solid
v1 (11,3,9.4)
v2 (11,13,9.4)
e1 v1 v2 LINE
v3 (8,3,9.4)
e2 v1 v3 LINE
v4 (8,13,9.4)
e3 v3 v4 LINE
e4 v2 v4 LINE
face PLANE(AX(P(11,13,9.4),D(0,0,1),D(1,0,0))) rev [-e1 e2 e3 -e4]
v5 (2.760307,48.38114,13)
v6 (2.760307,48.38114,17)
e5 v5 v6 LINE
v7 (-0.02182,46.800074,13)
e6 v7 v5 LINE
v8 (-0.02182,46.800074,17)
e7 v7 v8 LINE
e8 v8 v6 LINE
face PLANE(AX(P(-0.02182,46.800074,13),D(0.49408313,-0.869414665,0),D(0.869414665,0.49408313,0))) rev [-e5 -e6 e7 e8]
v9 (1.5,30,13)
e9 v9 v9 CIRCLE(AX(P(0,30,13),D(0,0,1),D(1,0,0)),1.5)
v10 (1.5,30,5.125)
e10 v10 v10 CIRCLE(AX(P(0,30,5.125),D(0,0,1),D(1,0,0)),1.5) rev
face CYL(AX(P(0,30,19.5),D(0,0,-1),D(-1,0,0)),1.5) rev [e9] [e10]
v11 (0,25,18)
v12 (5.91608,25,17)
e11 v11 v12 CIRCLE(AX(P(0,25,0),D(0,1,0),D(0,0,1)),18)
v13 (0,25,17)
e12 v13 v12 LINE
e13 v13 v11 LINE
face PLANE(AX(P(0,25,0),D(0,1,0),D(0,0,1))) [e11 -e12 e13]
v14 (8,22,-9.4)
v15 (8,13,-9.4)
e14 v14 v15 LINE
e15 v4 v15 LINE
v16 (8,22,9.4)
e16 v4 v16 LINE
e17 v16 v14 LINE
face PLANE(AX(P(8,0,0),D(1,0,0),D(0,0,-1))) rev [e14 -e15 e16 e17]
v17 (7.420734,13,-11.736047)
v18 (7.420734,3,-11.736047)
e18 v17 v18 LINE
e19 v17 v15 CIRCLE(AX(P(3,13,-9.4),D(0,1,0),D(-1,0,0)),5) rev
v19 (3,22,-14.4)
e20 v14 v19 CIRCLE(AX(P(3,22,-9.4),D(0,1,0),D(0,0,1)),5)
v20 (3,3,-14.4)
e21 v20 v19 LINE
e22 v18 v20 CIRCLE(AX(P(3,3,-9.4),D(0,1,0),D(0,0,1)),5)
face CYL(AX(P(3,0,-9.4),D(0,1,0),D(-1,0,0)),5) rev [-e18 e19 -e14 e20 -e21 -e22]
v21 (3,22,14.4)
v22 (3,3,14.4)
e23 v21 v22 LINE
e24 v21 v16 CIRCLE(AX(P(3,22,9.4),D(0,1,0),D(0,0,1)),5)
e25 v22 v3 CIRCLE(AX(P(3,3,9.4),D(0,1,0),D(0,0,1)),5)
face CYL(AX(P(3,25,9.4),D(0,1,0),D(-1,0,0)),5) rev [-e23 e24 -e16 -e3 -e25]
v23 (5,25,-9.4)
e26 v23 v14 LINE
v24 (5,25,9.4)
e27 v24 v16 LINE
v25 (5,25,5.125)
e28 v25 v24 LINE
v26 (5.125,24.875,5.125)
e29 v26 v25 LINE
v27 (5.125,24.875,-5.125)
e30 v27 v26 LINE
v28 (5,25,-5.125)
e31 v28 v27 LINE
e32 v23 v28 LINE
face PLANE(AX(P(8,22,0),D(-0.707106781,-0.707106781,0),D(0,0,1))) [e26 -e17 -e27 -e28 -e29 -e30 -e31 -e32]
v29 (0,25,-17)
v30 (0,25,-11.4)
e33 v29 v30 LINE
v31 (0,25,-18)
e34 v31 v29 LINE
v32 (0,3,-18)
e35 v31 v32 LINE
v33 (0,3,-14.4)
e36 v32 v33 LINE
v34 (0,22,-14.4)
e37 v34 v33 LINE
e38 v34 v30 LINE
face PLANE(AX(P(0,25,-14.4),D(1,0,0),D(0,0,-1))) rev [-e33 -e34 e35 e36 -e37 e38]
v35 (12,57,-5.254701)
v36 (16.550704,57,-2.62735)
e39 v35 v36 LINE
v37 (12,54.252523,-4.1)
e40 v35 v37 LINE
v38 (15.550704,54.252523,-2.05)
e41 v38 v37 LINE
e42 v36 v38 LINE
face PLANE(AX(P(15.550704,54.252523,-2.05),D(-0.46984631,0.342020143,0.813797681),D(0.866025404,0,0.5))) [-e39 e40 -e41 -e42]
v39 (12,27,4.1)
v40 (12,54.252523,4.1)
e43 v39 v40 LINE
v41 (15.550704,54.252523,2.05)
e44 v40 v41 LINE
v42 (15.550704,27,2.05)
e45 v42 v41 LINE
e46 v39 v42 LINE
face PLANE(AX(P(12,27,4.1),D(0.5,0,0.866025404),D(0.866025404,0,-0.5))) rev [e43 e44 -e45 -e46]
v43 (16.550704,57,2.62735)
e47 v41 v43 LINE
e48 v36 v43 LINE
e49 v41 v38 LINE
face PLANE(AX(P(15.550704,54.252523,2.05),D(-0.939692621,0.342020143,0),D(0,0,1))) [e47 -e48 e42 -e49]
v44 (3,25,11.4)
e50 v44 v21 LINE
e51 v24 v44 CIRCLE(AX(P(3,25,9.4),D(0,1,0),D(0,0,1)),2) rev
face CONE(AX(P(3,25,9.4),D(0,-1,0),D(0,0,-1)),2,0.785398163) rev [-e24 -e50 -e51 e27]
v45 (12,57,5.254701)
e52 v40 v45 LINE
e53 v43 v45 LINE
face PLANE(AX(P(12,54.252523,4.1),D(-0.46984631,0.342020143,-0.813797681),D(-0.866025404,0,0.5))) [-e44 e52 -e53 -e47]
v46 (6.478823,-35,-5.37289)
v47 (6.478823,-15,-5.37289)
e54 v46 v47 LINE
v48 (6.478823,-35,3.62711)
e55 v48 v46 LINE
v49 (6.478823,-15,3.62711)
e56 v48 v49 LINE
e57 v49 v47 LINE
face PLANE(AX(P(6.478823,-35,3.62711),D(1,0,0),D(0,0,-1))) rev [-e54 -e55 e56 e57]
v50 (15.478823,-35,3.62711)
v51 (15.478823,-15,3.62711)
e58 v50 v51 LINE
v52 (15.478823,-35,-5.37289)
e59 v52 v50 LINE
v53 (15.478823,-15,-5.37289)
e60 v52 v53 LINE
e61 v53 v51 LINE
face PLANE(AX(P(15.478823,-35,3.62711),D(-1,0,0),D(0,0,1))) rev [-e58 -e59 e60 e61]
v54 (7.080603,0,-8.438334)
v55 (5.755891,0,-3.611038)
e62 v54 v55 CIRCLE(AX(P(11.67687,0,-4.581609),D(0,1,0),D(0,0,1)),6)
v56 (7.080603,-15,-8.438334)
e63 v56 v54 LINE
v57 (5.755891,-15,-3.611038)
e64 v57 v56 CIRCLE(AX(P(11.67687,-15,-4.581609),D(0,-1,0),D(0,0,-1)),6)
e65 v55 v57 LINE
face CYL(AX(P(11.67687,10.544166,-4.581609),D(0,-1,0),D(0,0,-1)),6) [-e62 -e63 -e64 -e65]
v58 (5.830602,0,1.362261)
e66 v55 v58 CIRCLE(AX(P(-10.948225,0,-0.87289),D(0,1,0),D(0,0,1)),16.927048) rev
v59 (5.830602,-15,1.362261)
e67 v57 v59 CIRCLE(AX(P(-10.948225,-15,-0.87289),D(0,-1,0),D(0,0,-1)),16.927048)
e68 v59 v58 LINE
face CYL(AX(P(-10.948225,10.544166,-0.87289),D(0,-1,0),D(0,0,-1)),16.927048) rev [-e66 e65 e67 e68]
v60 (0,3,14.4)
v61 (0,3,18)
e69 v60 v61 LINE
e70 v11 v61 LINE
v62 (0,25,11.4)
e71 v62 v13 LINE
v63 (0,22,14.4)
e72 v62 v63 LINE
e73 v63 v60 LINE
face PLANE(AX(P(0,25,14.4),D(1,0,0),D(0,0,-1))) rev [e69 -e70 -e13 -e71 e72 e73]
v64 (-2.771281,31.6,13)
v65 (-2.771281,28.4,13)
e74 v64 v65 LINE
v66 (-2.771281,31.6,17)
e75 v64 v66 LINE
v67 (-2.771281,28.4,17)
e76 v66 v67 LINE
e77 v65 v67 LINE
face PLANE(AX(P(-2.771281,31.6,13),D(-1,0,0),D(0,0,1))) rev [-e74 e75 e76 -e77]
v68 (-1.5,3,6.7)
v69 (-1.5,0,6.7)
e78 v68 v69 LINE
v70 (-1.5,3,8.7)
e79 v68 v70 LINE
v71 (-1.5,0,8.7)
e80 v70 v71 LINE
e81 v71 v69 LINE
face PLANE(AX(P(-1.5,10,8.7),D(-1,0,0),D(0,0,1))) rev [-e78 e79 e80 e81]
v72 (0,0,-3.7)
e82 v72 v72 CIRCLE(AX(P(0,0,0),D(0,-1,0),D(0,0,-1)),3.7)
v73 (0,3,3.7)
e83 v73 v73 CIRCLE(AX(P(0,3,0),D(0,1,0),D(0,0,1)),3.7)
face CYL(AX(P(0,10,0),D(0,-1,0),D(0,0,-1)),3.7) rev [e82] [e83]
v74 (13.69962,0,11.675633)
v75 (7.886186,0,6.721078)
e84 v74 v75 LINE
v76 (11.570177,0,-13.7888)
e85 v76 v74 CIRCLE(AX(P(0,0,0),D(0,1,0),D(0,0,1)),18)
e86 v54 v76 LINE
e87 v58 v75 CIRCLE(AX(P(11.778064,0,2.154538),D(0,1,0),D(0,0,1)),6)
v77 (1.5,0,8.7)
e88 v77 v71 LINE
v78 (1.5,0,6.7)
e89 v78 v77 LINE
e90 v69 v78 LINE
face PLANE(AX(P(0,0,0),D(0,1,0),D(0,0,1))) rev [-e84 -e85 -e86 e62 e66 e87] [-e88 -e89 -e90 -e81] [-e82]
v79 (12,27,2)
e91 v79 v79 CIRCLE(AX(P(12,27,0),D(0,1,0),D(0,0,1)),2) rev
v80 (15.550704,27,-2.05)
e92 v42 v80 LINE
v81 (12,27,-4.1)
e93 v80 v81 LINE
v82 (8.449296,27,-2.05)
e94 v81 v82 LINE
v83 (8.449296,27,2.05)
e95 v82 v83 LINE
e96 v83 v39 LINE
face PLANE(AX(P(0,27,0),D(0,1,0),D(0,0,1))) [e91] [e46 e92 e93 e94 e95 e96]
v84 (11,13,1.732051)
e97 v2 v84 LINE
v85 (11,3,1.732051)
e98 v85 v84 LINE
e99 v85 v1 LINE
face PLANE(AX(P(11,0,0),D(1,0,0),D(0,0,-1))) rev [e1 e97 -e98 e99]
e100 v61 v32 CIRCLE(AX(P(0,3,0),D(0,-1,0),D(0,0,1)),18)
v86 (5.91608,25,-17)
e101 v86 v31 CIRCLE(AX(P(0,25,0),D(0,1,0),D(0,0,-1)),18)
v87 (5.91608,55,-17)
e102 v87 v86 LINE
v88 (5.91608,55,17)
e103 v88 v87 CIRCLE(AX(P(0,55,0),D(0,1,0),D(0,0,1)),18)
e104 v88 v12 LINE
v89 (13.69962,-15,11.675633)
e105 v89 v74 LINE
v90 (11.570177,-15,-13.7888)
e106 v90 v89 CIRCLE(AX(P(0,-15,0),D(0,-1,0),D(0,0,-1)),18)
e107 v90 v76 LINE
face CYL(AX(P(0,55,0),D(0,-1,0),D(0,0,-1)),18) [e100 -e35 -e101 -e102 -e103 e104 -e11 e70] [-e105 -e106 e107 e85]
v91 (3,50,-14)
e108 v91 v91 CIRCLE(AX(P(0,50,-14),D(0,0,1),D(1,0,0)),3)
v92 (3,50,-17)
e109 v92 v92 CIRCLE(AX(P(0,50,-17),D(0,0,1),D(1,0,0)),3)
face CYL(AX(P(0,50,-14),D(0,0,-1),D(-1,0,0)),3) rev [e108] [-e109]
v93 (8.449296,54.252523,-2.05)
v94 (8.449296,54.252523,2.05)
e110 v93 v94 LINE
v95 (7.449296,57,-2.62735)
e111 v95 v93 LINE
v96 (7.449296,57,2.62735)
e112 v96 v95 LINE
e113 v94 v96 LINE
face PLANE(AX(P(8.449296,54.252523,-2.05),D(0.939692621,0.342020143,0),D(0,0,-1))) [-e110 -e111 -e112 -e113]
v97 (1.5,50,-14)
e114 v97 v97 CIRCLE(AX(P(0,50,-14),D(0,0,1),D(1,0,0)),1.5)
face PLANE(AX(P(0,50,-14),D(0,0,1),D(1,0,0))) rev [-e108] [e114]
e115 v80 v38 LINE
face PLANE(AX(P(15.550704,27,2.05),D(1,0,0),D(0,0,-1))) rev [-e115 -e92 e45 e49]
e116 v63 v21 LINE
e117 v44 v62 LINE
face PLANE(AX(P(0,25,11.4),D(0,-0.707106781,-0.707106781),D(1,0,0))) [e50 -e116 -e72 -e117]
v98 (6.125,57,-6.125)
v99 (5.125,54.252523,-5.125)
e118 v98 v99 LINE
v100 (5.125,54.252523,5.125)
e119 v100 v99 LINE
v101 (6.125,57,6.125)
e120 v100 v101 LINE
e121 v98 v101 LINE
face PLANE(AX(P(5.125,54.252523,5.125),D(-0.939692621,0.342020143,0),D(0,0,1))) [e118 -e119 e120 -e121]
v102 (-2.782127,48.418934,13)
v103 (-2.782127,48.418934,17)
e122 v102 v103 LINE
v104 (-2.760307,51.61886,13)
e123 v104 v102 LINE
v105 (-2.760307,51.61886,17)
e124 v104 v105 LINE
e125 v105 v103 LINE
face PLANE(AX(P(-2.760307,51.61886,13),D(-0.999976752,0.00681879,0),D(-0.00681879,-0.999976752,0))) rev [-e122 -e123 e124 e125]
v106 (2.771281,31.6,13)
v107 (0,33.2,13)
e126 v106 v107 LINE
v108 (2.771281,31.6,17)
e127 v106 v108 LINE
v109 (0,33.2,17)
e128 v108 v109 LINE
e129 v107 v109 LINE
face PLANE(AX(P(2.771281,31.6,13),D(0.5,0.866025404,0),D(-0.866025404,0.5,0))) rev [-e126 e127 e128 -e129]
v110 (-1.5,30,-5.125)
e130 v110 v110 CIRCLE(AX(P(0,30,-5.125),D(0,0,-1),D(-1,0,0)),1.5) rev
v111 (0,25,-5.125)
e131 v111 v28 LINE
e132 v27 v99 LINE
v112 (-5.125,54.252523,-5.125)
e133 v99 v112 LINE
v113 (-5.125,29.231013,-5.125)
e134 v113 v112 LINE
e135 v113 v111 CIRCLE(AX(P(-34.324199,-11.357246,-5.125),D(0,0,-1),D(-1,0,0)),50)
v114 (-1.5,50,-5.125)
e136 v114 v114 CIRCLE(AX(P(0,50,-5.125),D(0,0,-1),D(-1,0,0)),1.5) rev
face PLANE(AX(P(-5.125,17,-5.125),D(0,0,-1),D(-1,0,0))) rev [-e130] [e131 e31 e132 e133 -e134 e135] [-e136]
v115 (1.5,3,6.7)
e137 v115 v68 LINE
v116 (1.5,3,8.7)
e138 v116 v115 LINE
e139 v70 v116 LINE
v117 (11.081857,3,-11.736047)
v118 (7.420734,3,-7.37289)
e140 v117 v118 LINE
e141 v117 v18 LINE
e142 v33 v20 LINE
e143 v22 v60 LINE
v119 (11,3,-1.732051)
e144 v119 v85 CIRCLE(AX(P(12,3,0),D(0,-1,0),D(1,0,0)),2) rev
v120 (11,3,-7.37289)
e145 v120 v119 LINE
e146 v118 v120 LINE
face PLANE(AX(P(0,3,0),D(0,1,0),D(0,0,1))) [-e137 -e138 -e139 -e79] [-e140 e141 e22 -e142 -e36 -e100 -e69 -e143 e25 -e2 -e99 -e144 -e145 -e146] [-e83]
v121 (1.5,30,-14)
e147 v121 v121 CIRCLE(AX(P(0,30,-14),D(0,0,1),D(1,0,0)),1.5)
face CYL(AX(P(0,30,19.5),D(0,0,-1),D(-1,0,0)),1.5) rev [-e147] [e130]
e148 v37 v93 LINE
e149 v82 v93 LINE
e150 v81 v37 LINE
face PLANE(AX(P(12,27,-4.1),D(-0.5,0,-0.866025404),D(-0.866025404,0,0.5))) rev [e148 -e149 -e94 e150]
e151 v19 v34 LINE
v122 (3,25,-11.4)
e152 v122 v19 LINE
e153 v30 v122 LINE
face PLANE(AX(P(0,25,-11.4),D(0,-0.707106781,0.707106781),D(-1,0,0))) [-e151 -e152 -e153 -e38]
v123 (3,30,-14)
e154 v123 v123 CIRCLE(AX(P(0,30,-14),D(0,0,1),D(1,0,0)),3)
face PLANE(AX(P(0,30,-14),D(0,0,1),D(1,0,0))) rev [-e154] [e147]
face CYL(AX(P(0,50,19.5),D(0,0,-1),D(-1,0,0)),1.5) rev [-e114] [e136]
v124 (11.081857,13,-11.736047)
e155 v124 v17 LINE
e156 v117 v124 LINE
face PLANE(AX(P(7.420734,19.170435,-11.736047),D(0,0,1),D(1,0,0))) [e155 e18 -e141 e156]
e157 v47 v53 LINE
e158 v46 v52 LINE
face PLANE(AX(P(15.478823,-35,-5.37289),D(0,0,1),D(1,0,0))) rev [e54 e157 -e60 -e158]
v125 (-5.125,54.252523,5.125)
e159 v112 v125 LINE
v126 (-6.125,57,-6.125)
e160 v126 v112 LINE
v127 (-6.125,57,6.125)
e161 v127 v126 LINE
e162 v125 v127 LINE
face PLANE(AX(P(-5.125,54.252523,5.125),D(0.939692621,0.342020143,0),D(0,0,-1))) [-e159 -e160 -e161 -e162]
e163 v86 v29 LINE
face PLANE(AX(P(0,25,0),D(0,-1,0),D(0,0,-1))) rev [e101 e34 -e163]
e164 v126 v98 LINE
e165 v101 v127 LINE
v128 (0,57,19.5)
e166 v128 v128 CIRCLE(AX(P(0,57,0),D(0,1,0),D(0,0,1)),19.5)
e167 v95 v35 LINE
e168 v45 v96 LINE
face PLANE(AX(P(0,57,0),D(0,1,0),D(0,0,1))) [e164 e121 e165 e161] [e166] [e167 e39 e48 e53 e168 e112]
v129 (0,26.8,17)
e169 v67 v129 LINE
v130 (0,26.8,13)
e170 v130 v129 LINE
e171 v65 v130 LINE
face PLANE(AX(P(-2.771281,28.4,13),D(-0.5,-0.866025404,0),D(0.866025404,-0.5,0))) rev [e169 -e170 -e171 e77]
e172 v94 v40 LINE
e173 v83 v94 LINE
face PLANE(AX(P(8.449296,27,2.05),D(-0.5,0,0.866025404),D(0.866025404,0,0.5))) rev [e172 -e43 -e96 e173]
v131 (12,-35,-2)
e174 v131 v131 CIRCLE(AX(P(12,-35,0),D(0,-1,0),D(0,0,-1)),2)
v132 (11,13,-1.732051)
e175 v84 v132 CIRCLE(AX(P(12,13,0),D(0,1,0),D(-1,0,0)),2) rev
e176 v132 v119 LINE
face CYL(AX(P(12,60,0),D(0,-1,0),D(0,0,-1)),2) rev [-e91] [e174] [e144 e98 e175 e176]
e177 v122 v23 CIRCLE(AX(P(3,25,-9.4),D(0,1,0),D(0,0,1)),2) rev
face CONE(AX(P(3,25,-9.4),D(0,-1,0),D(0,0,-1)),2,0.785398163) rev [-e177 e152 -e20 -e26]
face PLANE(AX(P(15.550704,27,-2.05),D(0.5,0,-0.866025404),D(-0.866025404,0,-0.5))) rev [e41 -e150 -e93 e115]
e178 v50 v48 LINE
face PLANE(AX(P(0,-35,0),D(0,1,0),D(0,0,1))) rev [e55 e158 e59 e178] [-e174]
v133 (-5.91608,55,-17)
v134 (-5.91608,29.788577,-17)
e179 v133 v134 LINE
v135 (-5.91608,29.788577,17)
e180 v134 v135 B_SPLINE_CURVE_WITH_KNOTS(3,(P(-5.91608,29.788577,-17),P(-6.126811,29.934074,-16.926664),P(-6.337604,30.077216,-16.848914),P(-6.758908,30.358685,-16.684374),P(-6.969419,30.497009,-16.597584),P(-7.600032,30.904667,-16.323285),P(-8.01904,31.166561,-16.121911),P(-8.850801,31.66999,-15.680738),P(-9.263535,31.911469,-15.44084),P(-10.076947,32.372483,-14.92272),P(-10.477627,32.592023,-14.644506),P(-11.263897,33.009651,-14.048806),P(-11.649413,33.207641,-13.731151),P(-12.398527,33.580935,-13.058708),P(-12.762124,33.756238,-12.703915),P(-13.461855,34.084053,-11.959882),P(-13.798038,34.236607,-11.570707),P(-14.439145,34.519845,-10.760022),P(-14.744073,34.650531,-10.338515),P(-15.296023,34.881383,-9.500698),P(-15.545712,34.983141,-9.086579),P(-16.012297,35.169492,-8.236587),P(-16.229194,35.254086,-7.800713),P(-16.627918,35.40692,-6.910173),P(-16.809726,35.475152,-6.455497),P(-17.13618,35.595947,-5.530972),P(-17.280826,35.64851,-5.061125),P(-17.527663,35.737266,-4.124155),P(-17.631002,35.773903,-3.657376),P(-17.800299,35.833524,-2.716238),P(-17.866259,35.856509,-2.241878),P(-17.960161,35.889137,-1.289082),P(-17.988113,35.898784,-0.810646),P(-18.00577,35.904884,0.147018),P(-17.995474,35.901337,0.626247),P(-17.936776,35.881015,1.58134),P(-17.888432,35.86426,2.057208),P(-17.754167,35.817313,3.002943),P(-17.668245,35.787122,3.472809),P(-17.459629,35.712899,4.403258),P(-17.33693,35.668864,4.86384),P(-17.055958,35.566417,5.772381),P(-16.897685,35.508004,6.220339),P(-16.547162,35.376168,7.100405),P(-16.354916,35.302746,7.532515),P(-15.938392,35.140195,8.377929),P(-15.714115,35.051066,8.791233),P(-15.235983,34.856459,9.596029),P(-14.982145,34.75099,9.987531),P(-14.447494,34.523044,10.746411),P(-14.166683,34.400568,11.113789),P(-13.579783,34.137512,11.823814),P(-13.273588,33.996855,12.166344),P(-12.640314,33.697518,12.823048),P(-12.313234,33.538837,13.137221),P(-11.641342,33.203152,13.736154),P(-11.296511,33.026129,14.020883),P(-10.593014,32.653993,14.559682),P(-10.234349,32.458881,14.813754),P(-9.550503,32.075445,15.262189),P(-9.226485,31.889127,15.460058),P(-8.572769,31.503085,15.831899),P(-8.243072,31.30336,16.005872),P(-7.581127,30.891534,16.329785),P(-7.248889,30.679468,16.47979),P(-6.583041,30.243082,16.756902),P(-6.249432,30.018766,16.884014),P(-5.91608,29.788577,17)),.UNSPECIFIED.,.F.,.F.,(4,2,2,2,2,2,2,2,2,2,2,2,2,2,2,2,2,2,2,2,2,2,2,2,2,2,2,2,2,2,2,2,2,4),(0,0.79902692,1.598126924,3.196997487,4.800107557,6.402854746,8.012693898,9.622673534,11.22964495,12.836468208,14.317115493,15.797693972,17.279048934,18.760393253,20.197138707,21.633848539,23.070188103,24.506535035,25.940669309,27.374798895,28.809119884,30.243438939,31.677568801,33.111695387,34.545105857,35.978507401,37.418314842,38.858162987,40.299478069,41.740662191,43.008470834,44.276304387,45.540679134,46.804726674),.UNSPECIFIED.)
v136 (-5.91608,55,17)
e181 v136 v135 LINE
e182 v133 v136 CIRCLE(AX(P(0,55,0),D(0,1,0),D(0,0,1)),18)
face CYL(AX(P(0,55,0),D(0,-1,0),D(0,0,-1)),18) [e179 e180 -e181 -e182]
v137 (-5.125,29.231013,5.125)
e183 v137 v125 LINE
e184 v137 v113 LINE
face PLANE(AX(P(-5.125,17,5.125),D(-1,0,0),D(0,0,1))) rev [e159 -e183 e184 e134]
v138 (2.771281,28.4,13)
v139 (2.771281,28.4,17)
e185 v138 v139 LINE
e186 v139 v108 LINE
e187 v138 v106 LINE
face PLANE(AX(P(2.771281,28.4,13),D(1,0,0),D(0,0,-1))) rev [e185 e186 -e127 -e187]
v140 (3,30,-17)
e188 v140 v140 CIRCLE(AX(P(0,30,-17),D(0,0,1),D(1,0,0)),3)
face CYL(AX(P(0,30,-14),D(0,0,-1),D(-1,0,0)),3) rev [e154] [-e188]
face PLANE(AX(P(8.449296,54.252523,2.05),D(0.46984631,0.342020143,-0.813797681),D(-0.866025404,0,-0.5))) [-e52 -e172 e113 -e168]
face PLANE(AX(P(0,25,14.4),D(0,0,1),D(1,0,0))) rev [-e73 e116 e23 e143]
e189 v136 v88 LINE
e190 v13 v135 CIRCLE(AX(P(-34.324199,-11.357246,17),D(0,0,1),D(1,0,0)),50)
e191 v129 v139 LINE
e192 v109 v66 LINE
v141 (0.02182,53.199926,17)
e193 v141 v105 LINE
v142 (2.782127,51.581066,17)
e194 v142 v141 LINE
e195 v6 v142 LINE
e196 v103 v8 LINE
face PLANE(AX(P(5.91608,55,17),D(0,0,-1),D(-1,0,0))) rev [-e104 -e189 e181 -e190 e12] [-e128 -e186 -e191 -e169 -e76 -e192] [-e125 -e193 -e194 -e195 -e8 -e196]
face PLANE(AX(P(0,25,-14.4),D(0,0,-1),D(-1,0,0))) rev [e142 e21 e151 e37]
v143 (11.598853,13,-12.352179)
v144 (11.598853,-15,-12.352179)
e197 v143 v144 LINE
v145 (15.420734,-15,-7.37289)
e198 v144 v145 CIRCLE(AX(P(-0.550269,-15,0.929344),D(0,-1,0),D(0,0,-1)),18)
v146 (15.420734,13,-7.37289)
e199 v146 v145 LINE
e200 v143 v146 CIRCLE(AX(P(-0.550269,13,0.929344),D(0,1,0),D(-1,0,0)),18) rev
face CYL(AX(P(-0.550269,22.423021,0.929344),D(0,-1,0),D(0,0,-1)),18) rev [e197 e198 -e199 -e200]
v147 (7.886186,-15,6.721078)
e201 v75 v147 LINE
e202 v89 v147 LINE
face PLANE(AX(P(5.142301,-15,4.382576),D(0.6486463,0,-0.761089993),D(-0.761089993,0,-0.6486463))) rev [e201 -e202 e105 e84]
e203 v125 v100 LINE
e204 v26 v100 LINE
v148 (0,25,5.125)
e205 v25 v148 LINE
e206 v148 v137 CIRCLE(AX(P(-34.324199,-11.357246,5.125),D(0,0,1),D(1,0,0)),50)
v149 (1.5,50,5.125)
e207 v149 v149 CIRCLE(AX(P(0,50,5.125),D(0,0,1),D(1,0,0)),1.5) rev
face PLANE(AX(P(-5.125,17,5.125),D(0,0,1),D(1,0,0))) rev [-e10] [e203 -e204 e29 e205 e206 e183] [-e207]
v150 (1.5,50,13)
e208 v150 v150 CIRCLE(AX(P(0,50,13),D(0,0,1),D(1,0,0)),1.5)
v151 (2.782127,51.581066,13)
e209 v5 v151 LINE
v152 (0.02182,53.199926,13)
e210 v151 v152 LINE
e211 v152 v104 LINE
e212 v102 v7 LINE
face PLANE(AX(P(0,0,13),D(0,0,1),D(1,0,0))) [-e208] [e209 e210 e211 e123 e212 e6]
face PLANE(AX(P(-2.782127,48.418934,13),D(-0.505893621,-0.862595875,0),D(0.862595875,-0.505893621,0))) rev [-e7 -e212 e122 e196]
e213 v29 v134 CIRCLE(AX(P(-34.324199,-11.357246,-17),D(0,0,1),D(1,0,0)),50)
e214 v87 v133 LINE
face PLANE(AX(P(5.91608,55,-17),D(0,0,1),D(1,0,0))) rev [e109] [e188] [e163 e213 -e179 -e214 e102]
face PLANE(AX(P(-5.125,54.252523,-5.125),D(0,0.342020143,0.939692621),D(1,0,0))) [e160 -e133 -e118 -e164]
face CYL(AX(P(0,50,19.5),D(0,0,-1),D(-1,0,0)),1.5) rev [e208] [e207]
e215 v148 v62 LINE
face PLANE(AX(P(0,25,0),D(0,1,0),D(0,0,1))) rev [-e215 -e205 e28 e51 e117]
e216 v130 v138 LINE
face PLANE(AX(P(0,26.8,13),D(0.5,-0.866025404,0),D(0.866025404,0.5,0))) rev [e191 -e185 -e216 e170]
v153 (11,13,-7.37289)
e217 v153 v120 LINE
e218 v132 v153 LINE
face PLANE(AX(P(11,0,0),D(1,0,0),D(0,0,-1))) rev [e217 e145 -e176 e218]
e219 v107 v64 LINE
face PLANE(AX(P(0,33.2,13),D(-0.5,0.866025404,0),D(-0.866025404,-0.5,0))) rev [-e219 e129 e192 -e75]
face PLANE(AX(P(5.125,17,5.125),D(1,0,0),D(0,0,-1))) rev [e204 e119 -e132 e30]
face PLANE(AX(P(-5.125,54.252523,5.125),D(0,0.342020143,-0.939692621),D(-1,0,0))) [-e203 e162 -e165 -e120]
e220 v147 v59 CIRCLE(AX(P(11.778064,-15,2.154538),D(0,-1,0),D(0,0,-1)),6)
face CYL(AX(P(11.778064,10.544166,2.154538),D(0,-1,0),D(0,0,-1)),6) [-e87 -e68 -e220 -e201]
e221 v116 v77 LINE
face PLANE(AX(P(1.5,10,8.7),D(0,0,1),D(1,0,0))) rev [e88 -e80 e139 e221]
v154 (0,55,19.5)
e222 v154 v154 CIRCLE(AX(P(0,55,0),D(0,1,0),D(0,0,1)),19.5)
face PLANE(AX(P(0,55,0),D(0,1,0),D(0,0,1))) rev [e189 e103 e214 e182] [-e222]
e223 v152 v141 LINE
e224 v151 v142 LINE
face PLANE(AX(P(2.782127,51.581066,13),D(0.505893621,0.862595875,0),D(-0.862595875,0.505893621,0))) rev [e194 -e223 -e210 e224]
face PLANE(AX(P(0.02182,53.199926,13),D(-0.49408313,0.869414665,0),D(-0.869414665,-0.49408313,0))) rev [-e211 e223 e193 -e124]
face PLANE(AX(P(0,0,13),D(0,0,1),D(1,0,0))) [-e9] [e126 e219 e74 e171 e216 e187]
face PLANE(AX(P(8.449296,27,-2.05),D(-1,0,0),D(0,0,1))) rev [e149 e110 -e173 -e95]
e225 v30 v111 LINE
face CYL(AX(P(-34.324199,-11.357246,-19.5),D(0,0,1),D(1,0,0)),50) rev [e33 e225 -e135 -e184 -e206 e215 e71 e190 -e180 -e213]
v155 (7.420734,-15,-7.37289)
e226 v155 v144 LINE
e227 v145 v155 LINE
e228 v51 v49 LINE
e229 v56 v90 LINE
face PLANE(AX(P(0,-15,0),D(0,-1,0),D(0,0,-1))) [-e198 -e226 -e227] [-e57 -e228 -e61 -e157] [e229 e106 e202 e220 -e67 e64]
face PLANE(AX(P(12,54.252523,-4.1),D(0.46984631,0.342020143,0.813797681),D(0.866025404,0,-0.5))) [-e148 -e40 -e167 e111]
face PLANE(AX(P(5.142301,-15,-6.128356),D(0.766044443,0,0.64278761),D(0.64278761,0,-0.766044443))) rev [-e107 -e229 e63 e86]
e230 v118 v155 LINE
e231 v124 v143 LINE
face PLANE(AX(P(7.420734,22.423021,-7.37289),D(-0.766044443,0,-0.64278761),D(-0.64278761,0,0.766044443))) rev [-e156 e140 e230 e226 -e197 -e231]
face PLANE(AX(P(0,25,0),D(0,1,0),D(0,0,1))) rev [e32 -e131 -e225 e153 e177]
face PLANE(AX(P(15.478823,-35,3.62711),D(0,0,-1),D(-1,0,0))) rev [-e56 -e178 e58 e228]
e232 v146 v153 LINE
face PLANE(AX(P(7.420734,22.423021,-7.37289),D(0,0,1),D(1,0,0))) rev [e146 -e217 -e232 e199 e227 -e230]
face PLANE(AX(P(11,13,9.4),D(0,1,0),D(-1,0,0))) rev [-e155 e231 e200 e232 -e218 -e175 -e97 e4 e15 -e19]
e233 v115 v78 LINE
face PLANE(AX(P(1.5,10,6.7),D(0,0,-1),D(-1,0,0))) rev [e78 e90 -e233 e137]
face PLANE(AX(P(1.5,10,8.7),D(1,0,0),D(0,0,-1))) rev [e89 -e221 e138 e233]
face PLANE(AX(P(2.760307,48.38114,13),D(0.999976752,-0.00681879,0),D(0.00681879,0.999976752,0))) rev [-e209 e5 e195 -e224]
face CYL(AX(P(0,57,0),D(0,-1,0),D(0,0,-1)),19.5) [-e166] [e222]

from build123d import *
from build123d.topology import SkipClean

# Parameters (mm, degrees)
SKETCH_1_R          = 18
EXTRUDE_1_DEPTH     = 55
SKETCH_2_R          = 19.5
EXTRUDE_2_DEPTH     = 2
SKETCH_3_W          = 10.25
SKETCH_3_H          = 10.25
CUT_EXTRUDE_1_DEPTH = 40
EXTRUDE_START       = 15
EXTRUDE_3_DEPTH     = 15
BOSS_EXTRUDE1_START = 20
SKETCH1_R           = 18
BOSS_EXTRUDE1_DEPTH = 20
BOSS_EXTRUDE2_START = 7
SKETCH3_R           = 18
BOSS_EXTRUDE2_DEPTH = 7
SKETCH4_W           = 10.2
SKETCH4_H           = 10.2
CUT_EXTRUDE2_DEPTH  = 27
CUT_EXTRUDE4_DEPTH  = 25
BOSS_EXTRUDE3_DEPTH = 3
SKETCH9_W           = 36
SKETCH9_H           = 22
CUT_EXTRUDE5_DEPTH  = 8
SKETCH10_R          = 3.7
SKETCH10_W          = 3
SKETCH10_H          = 2
CUT_EXTRUDE6_DEPTH  = 10
SKETCH11_R          = 2
CUT_EXTRUDE7_DEPTH  = 102
SKETCH15_R          = 18
CUT_EXTRUDE9_DEPTH  = 27
CUT_EXTRUDE11_DEPTH = 30
SKETCH18_R          = 1.5
CUT_EXTRUDE12_DEPTH = 71.437915926
SKETCH19_R          = 3
CUT_EXTRUDE13_DEPTH = 3
BOSS_EXTRUDE5_DEPTH = 22
CUT_EXTRUDE16_DEPTH = 4
CUT_EXTRUDE17_DEPTH = 30
CUT_EXTRUDE18_DEPTH = 71.437915926
FILLET2_R           = 5
SKETCH30_W          = 18.8
SKETCH30_H          = 10
CUT_EXTRUDE20_DEPTH = 3
CHAMFER1_SIZE       = 1
CHAMFER1_SIZE2      = 2.747477419
CHAMFER2_SIZE       = 1
CHAMFER2_SIZE2      = 2.747477419
BOSS_EXTRUDE7_START = 20
SKETCH37_W          = 9
SKETCH37_H          = 9
SKETCH37_R          = 2
BOSS_EXTRUDE7_DEPTH = 20
CUT_EXTRUDE22_DEPTH = 15
CUT_EXTRUDE23_REACH = 79.101
SKETCH40_W          = 4.363156696
SKETCH40_H          = 4.363156696
CUT_EXTRUDE24_DEPTH = 10
FILLET7_R           = 6
CHAMFER3_SIZE       = 3


with BuildPart() as part:
    # Эскиз1 → Бобышка-Вытянуть1 (new body)
    with BuildSketch(Plane(origin=(0, 0, 0), x_dir=(1, 0, 0), z_dir=(0, 1, 0))):
        with Locations(Location((0, 0, 0), (0, 0, 270))):
            Circle(SKETCH_1_R)
    extrude(amount=EXTRUDE_1_DEPTH)

    # Эскиз2 → Бобышка-Вытянуть2 (add)
    with BuildSketch(Plane(origin=(0, 55, 0), x_dir=(1, 0, 0), z_dir=(0, 1, 0))):
        with Locations(Location((0, 0, 0), (0, 0, 270))):
            Circle(SKETCH_2_R)
    extrude(amount=EXTRUDE_2_DEPTH)

    # Эскиз3 → Вырез-Вытянуть1 (cut)
    with BuildSketch(Plane(origin=(0, 57, 0), x_dir=(1, 0, 0), z_dir=(0, 1, 0))):
        Rectangle(SKETCH_3_W, SKETCH_3_H)
    extrude(amount=-CUT_EXTRUDE_1_DEPTH, mode=Mode.SUBTRACT)

    # Эскиз4 → Бобышка-Вытянуть3 (add)
    with SkipClean():  # the faces are left unmerged after this step: merging them gives an invalid solid
        with BuildSketch(Plane.XZ.offset(EXTRUDE_START)):
            with BuildLine():
                Line((5.142300877, -6.128355545), (11.570176974, -13.788799976))
                ThreePointArc((11.570176974, -13.788799976), (17.937391115, -1.5), (13.69961987, 11.675633406))
                Line((13.69961987, 11.675633406), (5.142300877, 4.38257561))
                Line((5.142300877, 4.38257561), (5.142300877, -6.128355545))
            make_face()
        extrude(amount=-EXTRUDE_3_DEPTH)

    # Sketch1 → Boss-Extrude1 (add)
    with BuildSketch(Plane.XZ.offset(15).offset(BOSS_EXTRUDE1_START)):
        with Locations(Location((0, 0, 0), (0, 0, 270))):
            Circle(SKETCH1_R)
    extrude(amount=-BOSS_EXTRUDE1_DEPTH)

    # Sketch3 → Boss-Extrude2 (add)
    with BuildSketch(Plane.XZ.offset(35).offset(BOSS_EXTRUDE2_START)):
        with Locations(Location((0, 0, 0), (0, 0, 270))):
            Circle(SKETCH3_R)
    extrude(amount=-BOSS_EXTRUDE2_DEPTH)

    # Sketch4 → Cut-Extrude2 (cut)
    with BuildSketch(Plane.XZ.offset(42)):
        Rectangle(SKETCH4_W, SKETCH4_H)
    extrude(amount=-CUT_EXTRUDE2_DEPTH, mode=Mode.SUBTRACT)

    # Sketch6 → Cut-Extrude4 (cut)
    with BuildSketch(Plane.XZ):
        with BuildLine():
            Line((0, 18), (0, -18))
            ThreePointArc((0, -18), (-18, 0), (0, 18))
        make_face()
    extrude(amount=-CUT_EXTRUDE4_DEPTH, mode=Mode.SUBTRACT)

    # Sketch8 → Boss-Extrude3 (add)
    with BuildSketch(Plane.XZ):
        with BuildLine():
            Line((0, -18), (0, 18))
            ThreePointArc((0, 18), (-18, 0), (0, -18))
        make_face()
    extrude(amount=-BOSS_EXTRUDE3_DEPTH)

    # Sketch9 → Cut-Extrude5 (cut)
    with BuildSketch(Plane.ZY):
        with Locations((0, 14)):
            Rectangle(SKETCH9_W, SKETCH9_H)
    extrude(amount=-CUT_EXTRUDE5_DEPTH, mode=Mode.SUBTRACT)

    # Sketch10 → Cut-Extrude6 (cut)
    with BuildSketch(Plane.XZ):
        with Locations(Location((0, 0, 0), (0, 0, 270))):
            Circle(SKETCH10_R)
        with Locations((0, 7.7)):
            Rectangle(SKETCH10_W, SKETCH10_H)
    extrude(amount=-CUT_EXTRUDE6_DEPTH, mode=Mode.SUBTRACT)

    # Sketch11 → Cut-Extrude7 (cut)
    with BuildSketch(Plane.XZ.offset(42)):
        with Locations(Location((12, 0, 0), (0, 0, 270))):
            Circle(SKETCH11_R)
    extrude(amount=-CUT_EXTRUDE7_DEPTH, mode=Mode.SUBTRACT)

    # Sketch15 → Cut-Extrude9 (cut)
    with BuildSketch(Plane.XZ.offset(42)):
        with Locations(Location((0, 0, 0), (0, 0, 310))):
            Circle(SKETCH15_R)
    extrude(amount=-CUT_EXTRUDE9_DEPTH, mode=Mode.SUBTRACT)

    # Sketch17 → Cut-Extrude11 (cut)
    with BuildSketch(Plane.XZ.offset(-25)):
        with BuildLine():
            Line((5.916079783, -17), (-5.916079783, -17))
            ThreePointArc((-5.916079783, -17), (0, -18), (5.916079783, -17))
        make_face()
        with BuildLine():
            Line((5.916079783, 17), (-5.916079783, 17))
            ThreePointArc((-5.916079783, 17), (0, 18), (5.916079783, 17))
        make_face()
    extrude(amount=-CUT_EXTRUDE11_DEPTH, mode=Mode.SUBTRACT)

    # Sketch18 → Cut-Extrude12 (cut, through all)
    with BuildSketch(Plane.XY.offset(-17)):
        with Locations(Location((0, 30, 0), (0, 0, 180))):
            Circle(SKETCH18_R)
        with Locations(Location((0, 50, 0), (0, 0, 180))):
            Circle(SKETCH18_R)
    extrude(amount=CUT_EXTRUDE12_DEPTH, mode=Mode.SUBTRACT)

    # Sketch19 → Cut-Extrude13 (cut)
    with BuildSketch(Plane.XY.offset(-17)):
        with Locations((0, 30)):
            Circle(SKETCH19_R)
        with Locations((0, 50)):
            Circle(SKETCH19_R)
    extrude(amount=CUT_EXTRUDE13_DEPTH, mode=Mode.SUBTRACT)

    # Sketch23 → Boss-Extrude5 (add)
    with BuildSketch(Plane(origin=(0, 3, 0), x_dir=(1, 0, 0), z_dir=(0, 1, 0))):
        with BuildLine():
            Line((0, -14.4), (8, -14.4))
            Line((8, -14.4), (8, -16.124515497))
            ThreePointArc((8, -16.124515497), (4.108449894, -17.524857759), (0, -18))
            Line((0, -18), (0, -14.4))
        make_face()
        with BuildLine():
            Line((0, 14.4), (8, 14.4))
            Line((8, 14.4), (8, 16.124515497))
            ThreePointArc((8, 16.124515497), (4.108449894, 17.524857759), (0, 18))
            Line((0, 18), (0, 14.4))
        make_face()
    extrude(amount=BOSS_EXTRUDE5_DEPTH)

    # Sketch25 → Cut-Extrude16 (cut)
    with BuildSketch(Plane.XY.offset(17)):
        Polygon((2.771281292, 28.4), (2.771281292, 31.6), (0, 33.2), (-2.771281292, 31.6), (-2.771281292, 28.4), (0, 26.8), align=None)
        Polygon((-2.782126929, 48.418933983), (-0.021820128, 46.800074394), (2.760306801, 48.381140412), (2.782126929, 51.581066017), (0.021820128, 53.199925606), (-2.760306801, 51.618859588), align=None)
    extrude(amount=-CUT_EXTRUDE16_DEPTH, mode=Mode.SUBTRACT)

    # Sketch26 → Cut-Extrude17 (cut)
    with BuildSketch(Plane(origin=(0, 57, 0), x_dir=(1, 0, 0), z_dir=(0, 1, 0))):
        Polygon((8.449295844, -2.05), (12, -4.1), (15.550704156, -2.05), (15.550704156, 2.05), (12, 4.1), (8.449295844, 2.05), align=None)
    extrude(amount=-CUT_EXTRUDE17_DEPTH, mode=Mode.SUBTRACT)

    # Sketch27 → Cut-Extrude18 (cut, through all)
    with BuildSketch(Plane.XY.offset(17)):
        with BuildLine():
            Line((-20, 36.547005384), (-20, 25))
            Line((-20, 25), (0, 25))
            ThreePointArc((0, 25), (-9.324199199, 31.944024015), (-20, 36.547005384))
        make_face()
    extrude(amount=-CUT_EXTRUDE18_DEPTH, mode=Mode.SUBTRACT)

    # Fillet2
    fillet2_edges = [part.edges().sort_by_distance(p)[0] for p in [
        (8, 14, -14.4),
        (8, 14, 14.4),
    ]]
    fillet(fillet2_edges, radius=FILLET2_R)

    # Sketch30 → Cut-Extrude20 (cut)
    with BuildSketch(Plane.ZY.offset(-8)):
        with Locations((0, 8)):
            Rectangle(SKETCH30_W, SKETCH30_H)
    extrude(amount=-CUT_EXTRUDE20_DEPTH, mode=Mode.SUBTRACT)

    # Chamfer1
    chamfer1_edges = [part.edges().sort_by_distance(p)[0] for p in [
        (5.125, 57, 0),
        (0, 57, -5.125),
        (-5.125, 57, 0),
        (0, 57, 5.125),
    ]]
    chamfer1_side = [part.faces().sort_by_distance(p)[0] for p in [
        (0, 57, -18.948456711),
    ]]
    chamfer(chamfer1_edges, length=CHAMFER1_SIZE, length2=CHAMFER1_SIZE2, reference=chamfer1_side[0])

    # Chamfer2
    chamfer2_edges = [part.edges().sort_by_distance(p)[0] for p in [
        (8.449295844, 57, 0),
        (10.224647922, 57, 3.075),
        (13.775352078, 57, 3.075),
        (15.550704156, 57, 0),
        (13.775352078, 57, -3.075),
        (10.224647922, 57, -3.075),
    ]]
    chamfer2_side = [part.faces().sort_by_distance(p)[0] for p in [
        (6.676543289, 57, 0),
    ]]
    chamfer(chamfer2_edges, length=CHAMFER2_SIZE, length2=CHAMFER2_SIZE2, reference=chamfer2_side[0])

    # Sketch37 → Boss-Extrude7 (add)
    with BuildSketch(Plane.XZ.offset(15).offset(BOSS_EXTRUDE7_START)):
        with Locations((10.978822628, -0.872889968)):
            Rectangle(SKETCH37_W, SKETCH37_H)
        with Locations(Location((12, 0, 0), (0, 0, 270))):
            Circle(SKETCH37_R, mode=Mode.SUBTRACT)
    extrude(amount=-BOSS_EXTRUDE7_DEPTH)

    # Sketch38 → Cut-Extrude22 (cut)
    with BuildSketch(Plane.XZ.offset(15)):
        with BuildLine():
            Line((5.142300877, -6.128355545), (5.142300877, 4.38257561))
            ThreePointArc((5.142300877, 4.38257561), (5.978822628, -0.872889968), (5.142300877, -6.128355545))
        make_face()
    extrude(amount=-CUT_EXTRUDE22_DEPTH, mode=Mode.SUBTRACT)

    # Cut-Extrude23: up to this face of the body (flat: up to its plane)
    cut_extrude23_end = Plane(part.part.faces().sort_by_distance((9.450359937, 13, 0))[0])
    # Sketch39 → Cut-Extrude23 (cut, up to the picked face)
    with BuildSketch(Plane.XZ.offset(15), mode=Mode.PRIVATE) as cut_extrude23_sk1:
        with BuildLine():
            Line((7.420733648, -7.372889968), (15.420733648, -7.372889968))
            ThreePointArc((15.420733648, -7.372889968), (13.728515389, -10.030415688), (11.598853111, -12.352178848))
            Line((11.598853111, -12.352178848), (7.420733648, -7.372889968))
        make_face()
    cut_extrude23_tool1 = split(extrude(cut_extrude23_sk1.sketch, amount=-CUT_EXTRUDE23_REACH, mode=Mode.PRIVATE), bisect_by=cut_extrude23_end, keep=Keep.BOTH, mode=Mode.PRIVATE)
    add(cut_extrude23_tool1.solids().sort_by(Axis((11.596211, -15, -9.081847), (0, 1, 0)))[0], mode=Mode.SUBTRACT)

    # Sketch40 → Cut-Extrude24 (cut)
    with BuildSketch(Plane(origin=(0, 3, 0), x_dir=(1, 0, 0), z_dir=(0, 1, 0))):
        with Locations((9.602311996, 9.554468316)):
            Rectangle(SKETCH40_W, SKETCH40_H)
    extrude(amount=CUT_EXTRUDE24_DEPTH, mode=Mode.SUBTRACT)

    # Fillet7
    fillet7_edges = [part.edges().sort_by_distance(p)[0] for p in [
        (5.142300877, -7.5, 4.38257561),
        (5.142300877, -7.5, -6.128355545),
    ]]
    fillet(fillet7_edges, radius=FILLET7_R)

    # Chamfer3
    # the kernel refuses this chamfer: 3 mm, written as the material it adds along each edge
    with BuildSketch(Plane(origin=(0, 25, 14.4), x_dir=(0, -0.9996219169112968, 0.02749587661058619), z_dir=(1, 0, 0))) as chamfer3_piece_1_section:
        Polygon((CHAMFER3_SIZE * 0.999621916911, CHAMFER3_SIZE * 0.0274958766106), (-CHAMFER3_SIZE * 0.0274958766106, CHAMFER3_SIZE * 0.999621916911), (0, 0), align=None)
    chamfer3_piece_1 = extrude(amount=3, mode=Mode.PRIVATE)
    chamfer3_piece_1 = chamfer3_piece_1 & Plane(origin=(-34.324199199, -11.357246174, 13.709552738), x_dir=(0.6864839839775441, 0.727144923479714, 0), z_dir=(0, 0, 1)) * Cylinder(50, 18, mode=Mode.PRIVATE)
    add(chamfer3_piece_1)
    with BuildSketch(Plane(origin=(0, 25, 14.4), x_dir=(0, -0.9996219169112968, 0.02749587661058619), z_dir=(1, 0, 0))) as chamfer3_piece_2_section:
        Polygon((CHAMFER3_SIZE * 0.999621916911, CHAMFER3_SIZE * 0.0274958766106), (-CHAMFER3_SIZE * 0.0274958766106, CHAMFER3_SIZE * 0.999621916911), (0, 0), align=None)
    chamfer3_piece_2 = extrude(amount=3, mode=Mode.PRIVATE)
    chamfer3_piece_2 = chamfer3_piece_2 - Plane(origin=(-34.324199199, -11.357246174, 13.260106339), x_dir=(0.6864839839775441, 0.727144923479714, 0), z_dir=(0, 0, 1)) * Cylinder(50, 18, mode=Mode.PRIVATE)
    add(chamfer3_piece_2)
    with BuildSketch(Plane(origin=(0, 25, -14.4), x_dir=(0, -0.9996219169112968, -0.02749587661058619), z_dir=(1, 0, 0))) as chamfer3_piece_3_section:
        Polygon((CHAMFER3_SIZE * 0.999621916911, -CHAMFER3_SIZE * 0.0274958766106), (-CHAMFER3_SIZE * 0.0274958766106, -CHAMFER3_SIZE * 0.999621916911), (0, 0), align=None)
    chamfer3_piece_3 = extrude(amount=3, mode=Mode.PRIVATE)
    chamfer3_piece_3 = chamfer3_piece_3 & Plane(origin=(-34.324199199, -11.357246174, -13.709552738), x_dir=(0.6864839839775441, 0.727144923479714, 0), z_dir=(0, 0, 1)) * Cylinder(50, 18, mode=Mode.PRIVATE)
    add(chamfer3_piece_3)
    with BuildSketch(Plane(origin=(0, 25, -14.4), x_dir=(0, -0.9996219169112968, -0.02749587661058619), z_dir=(1, 0, 0))) as chamfer3_piece_4_section:
        Polygon((CHAMFER3_SIZE * 0.999621916911, -CHAMFER3_SIZE * 0.0274958766106), (-CHAMFER3_SIZE * 0.0274958766106, -CHAMFER3_SIZE * 0.999621916911), (0, 0), align=None)
    chamfer3_piece_4 = extrude(amount=3, mode=Mode.PRIVATE)
    chamfer3_piece_4 = chamfer3_piece_4 - Plane(origin=(-34.324199199, -11.357246174, -13.260106339), x_dir=(0.6864839839775441, 0.727144923479714, 0), z_dir=(0, 0, 1)) * Cylinder(50, 18, mode=Mode.PRIVATE)
    add(chamfer3_piece_4)
    with BuildSketch(Plane(origin=(3, 25, 9.4), x_dir=(0, 0, 1), z_dir=(-1, 0, 0))) as chamfer3_piece_5:
        Polygon((5, -CHAMFER3_SIZE), (5 - CHAMFER3_SIZE, 0), (5, 0), align=None)
    revolve(axis=Axis((3, 25, 9.4), (0, 1, 0)), revolution_arc=90)
    with BuildSketch(Plane(origin=(3, 25, -9.4), x_dir=(1, 0, 0), z_dir=(0, 0, 1))) as chamfer3_piece_6:
        Polygon((5, -CHAMFER3_SIZE), (5 - CHAMFER3_SIZE, 0), (5, 0), align=None)
    revolve(axis=Axis((3, 25, -9.4), (0, 1, 0)), revolution_arc=90)
    with BuildSketch(Plane(origin=(8, 25, 9.4), x_dir=(-0.9996219169112968, 0.027495876610586775, -6.983036009170595e-15), z_dir=(0, 0, -1))) as chamfer3_piece_7_section:
        Polygon((CHAMFER3_SIZE * 0.999621916911, -CHAMFER3_SIZE * 0.0274958766106), (-CHAMFER3_SIZE * 0.0274958766106, -CHAMFER3_SIZE * 0.999621916911), (0, 0), align=None)
    chamfer3_piece_7 = extrude(amount=18.8, mode=Mode.PRIVATE)
    chamfer3_piece_7 = split(chamfer3_piece_7, bisect_by=Plane(origin=(5.125, 25.046535353, 7.2625), z_dir=(-1, 0, 0)), keep=Keep.TOP, mode=Mode.PRIVATE)
    chamfer3_piece_7 = split(chamfer3_piece_7, bisect_by=Plane(origin=(5.041671012, 25.046535353, 5.125), z_dir=(0, 0, 1)), keep=Keep.TOP, mode=Mode.PRIVATE)
    add(chamfer3_piece_7)
    with BuildSketch(Plane(origin=(8, 25, 9.4), x_dir=(-0.9996219169112968, 0.027495876610586775, -6.983036009170595e-15), z_dir=(0, 0, -1))) as chamfer3_piece_8_section:
        Polygon((CHAMFER3_SIZE * 0.999621916911, -CHAMFER3_SIZE * 0.0274958766106), (-CHAMFER3_SIZE * 0.0274958766106, -CHAMFER3_SIZE * 0.999621916911), (0, 0), align=None)
    chamfer3_piece_8 = extrude(amount=18.8, mode=Mode.PRIVATE)
    chamfer3_piece_8 = split(chamfer3_piece_8, bisect_by=Plane(origin=(5.125, 24.003702171, 7.2625), z_dir=(1, 0, 0)), keep=Keep.TOP, mode=Mode.PRIVATE)
    chamfer3_piece_8 = split(chamfer3_piece_8, bisect_by=Plane(origin=(7.023766044, 24.003702171, 5.125), z_dir=(0, 0, 1)), keep=Keep.TOP, mode=Mode.PRIVATE)
    add(chamfer3_piece_8)
    with BuildSketch(Plane(origin=(8, 25, 9.4), x_dir=(-0.9996219169112968, 0.027495876610586775, -6.983036009170595e-15), z_dir=(0, 0, -1))) as chamfer3_piece_9_section:
        Polygon((CHAMFER3_SIZE * 0.999621916911, -CHAMFER3_SIZE * 0.0274958766106), (-CHAMFER3_SIZE * 0.0274958766106, -CHAMFER3_SIZE * 0.999621916911), (0, 0), align=None)
    chamfer3_piece_9 = extrude(amount=18.8, mode=Mode.PRIVATE)
    chamfer3_piece_9 = split(chamfer3_piece_9, bisect_by=Plane(origin=(7.023766044, 24.003702171, -5.125), z_dir=(0, 0, 1)), keep=Keep.TOP, mode=Mode.PRIVATE)
    chamfer3_piece_9 = split(chamfer3_piece_9, bisect_by=Plane(origin=(5.125, 24.003702171, 0), z_dir=(1, 0, 0)), keep=Keep.TOP, mode=Mode.PRIVATE)
    chamfer3_piece_9 = split(chamfer3_piece_9, bisect_by=Plane(origin=(7.023766044, 24.003702171, 5.125), z_dir=(0, 0, -1)), keep=Keep.TOP, mode=Mode.PRIVATE)
    add(chamfer3_piece_9)
    with BuildSketch(Plane(origin=(8, 25, 9.4), x_dir=(-0.9996219169112968, 0.027495876610586775, -6.983036009170595e-15), z_dir=(0, 0, -1))) as chamfer3_piece_10_section:
        Polygon((CHAMFER3_SIZE * 0.999621916911, -CHAMFER3_SIZE * 0.0274958766106), (-CHAMFER3_SIZE * 0.0274958766106, -CHAMFER3_SIZE * 0.999621916911), (0, 0), align=None)
    chamfer3_piece_10 = extrude(amount=18.8, mode=Mode.PRIVATE)
    chamfer3_piece_10 = split(chamfer3_piece_10, bisect_by=Plane(origin=(5.041671012, 25.046535353, -5.125), z_dir=(0, 0, -1)), keep=Keep.TOP, mode=Mode.PRIVATE)
    chamfer3_piece_10 = split(chamfer3_piece_10, bisect_by=Plane(origin=(5.125, 25.046535353, -7.2625), z_dir=(-1, 0, 0)), keep=Keep.TOP, mode=Mode.PRIVATE)
    add(chamfer3_piece_10)
    with BuildSketch(Plane(origin=(8, 25, 9.4), x_dir=(-0.9996219169112968, 0.027495876610586775, -6.983036009170595e-15), z_dir=(0, 0, -1))) as chamfer3_piece_11_section:
        Polygon((CHAMFER3_SIZE * 0.999621916911, -CHAMFER3_SIZE * 0.0274958766106), (-CHAMFER3_SIZE * 0.0274958766106, -CHAMFER3_SIZE * 0.999621916911), (0, 0), align=None)
    chamfer3_piece_11 = extrude(amount=18.8, mode=Mode.PRIVATE)
    chamfer3_piece_11 = split(chamfer3_piece_11, bisect_by=Plane(origin=(7.023766044, 24.003702171, -5.125), z_dir=(0, 0, -1)), keep=Keep.TOP, mode=Mode.PRIVATE)
    chamfer3_piece_11 = split(chamfer3_piece_11, bisect_by=Plane(origin=(5.125, 24.003702171, -7.2625), z_dir=(1, 0, 0)), keep=Keep.TOP, mode=Mode.PRIVATE)
    add(chamfer3_piece_11)


solid = part.part
